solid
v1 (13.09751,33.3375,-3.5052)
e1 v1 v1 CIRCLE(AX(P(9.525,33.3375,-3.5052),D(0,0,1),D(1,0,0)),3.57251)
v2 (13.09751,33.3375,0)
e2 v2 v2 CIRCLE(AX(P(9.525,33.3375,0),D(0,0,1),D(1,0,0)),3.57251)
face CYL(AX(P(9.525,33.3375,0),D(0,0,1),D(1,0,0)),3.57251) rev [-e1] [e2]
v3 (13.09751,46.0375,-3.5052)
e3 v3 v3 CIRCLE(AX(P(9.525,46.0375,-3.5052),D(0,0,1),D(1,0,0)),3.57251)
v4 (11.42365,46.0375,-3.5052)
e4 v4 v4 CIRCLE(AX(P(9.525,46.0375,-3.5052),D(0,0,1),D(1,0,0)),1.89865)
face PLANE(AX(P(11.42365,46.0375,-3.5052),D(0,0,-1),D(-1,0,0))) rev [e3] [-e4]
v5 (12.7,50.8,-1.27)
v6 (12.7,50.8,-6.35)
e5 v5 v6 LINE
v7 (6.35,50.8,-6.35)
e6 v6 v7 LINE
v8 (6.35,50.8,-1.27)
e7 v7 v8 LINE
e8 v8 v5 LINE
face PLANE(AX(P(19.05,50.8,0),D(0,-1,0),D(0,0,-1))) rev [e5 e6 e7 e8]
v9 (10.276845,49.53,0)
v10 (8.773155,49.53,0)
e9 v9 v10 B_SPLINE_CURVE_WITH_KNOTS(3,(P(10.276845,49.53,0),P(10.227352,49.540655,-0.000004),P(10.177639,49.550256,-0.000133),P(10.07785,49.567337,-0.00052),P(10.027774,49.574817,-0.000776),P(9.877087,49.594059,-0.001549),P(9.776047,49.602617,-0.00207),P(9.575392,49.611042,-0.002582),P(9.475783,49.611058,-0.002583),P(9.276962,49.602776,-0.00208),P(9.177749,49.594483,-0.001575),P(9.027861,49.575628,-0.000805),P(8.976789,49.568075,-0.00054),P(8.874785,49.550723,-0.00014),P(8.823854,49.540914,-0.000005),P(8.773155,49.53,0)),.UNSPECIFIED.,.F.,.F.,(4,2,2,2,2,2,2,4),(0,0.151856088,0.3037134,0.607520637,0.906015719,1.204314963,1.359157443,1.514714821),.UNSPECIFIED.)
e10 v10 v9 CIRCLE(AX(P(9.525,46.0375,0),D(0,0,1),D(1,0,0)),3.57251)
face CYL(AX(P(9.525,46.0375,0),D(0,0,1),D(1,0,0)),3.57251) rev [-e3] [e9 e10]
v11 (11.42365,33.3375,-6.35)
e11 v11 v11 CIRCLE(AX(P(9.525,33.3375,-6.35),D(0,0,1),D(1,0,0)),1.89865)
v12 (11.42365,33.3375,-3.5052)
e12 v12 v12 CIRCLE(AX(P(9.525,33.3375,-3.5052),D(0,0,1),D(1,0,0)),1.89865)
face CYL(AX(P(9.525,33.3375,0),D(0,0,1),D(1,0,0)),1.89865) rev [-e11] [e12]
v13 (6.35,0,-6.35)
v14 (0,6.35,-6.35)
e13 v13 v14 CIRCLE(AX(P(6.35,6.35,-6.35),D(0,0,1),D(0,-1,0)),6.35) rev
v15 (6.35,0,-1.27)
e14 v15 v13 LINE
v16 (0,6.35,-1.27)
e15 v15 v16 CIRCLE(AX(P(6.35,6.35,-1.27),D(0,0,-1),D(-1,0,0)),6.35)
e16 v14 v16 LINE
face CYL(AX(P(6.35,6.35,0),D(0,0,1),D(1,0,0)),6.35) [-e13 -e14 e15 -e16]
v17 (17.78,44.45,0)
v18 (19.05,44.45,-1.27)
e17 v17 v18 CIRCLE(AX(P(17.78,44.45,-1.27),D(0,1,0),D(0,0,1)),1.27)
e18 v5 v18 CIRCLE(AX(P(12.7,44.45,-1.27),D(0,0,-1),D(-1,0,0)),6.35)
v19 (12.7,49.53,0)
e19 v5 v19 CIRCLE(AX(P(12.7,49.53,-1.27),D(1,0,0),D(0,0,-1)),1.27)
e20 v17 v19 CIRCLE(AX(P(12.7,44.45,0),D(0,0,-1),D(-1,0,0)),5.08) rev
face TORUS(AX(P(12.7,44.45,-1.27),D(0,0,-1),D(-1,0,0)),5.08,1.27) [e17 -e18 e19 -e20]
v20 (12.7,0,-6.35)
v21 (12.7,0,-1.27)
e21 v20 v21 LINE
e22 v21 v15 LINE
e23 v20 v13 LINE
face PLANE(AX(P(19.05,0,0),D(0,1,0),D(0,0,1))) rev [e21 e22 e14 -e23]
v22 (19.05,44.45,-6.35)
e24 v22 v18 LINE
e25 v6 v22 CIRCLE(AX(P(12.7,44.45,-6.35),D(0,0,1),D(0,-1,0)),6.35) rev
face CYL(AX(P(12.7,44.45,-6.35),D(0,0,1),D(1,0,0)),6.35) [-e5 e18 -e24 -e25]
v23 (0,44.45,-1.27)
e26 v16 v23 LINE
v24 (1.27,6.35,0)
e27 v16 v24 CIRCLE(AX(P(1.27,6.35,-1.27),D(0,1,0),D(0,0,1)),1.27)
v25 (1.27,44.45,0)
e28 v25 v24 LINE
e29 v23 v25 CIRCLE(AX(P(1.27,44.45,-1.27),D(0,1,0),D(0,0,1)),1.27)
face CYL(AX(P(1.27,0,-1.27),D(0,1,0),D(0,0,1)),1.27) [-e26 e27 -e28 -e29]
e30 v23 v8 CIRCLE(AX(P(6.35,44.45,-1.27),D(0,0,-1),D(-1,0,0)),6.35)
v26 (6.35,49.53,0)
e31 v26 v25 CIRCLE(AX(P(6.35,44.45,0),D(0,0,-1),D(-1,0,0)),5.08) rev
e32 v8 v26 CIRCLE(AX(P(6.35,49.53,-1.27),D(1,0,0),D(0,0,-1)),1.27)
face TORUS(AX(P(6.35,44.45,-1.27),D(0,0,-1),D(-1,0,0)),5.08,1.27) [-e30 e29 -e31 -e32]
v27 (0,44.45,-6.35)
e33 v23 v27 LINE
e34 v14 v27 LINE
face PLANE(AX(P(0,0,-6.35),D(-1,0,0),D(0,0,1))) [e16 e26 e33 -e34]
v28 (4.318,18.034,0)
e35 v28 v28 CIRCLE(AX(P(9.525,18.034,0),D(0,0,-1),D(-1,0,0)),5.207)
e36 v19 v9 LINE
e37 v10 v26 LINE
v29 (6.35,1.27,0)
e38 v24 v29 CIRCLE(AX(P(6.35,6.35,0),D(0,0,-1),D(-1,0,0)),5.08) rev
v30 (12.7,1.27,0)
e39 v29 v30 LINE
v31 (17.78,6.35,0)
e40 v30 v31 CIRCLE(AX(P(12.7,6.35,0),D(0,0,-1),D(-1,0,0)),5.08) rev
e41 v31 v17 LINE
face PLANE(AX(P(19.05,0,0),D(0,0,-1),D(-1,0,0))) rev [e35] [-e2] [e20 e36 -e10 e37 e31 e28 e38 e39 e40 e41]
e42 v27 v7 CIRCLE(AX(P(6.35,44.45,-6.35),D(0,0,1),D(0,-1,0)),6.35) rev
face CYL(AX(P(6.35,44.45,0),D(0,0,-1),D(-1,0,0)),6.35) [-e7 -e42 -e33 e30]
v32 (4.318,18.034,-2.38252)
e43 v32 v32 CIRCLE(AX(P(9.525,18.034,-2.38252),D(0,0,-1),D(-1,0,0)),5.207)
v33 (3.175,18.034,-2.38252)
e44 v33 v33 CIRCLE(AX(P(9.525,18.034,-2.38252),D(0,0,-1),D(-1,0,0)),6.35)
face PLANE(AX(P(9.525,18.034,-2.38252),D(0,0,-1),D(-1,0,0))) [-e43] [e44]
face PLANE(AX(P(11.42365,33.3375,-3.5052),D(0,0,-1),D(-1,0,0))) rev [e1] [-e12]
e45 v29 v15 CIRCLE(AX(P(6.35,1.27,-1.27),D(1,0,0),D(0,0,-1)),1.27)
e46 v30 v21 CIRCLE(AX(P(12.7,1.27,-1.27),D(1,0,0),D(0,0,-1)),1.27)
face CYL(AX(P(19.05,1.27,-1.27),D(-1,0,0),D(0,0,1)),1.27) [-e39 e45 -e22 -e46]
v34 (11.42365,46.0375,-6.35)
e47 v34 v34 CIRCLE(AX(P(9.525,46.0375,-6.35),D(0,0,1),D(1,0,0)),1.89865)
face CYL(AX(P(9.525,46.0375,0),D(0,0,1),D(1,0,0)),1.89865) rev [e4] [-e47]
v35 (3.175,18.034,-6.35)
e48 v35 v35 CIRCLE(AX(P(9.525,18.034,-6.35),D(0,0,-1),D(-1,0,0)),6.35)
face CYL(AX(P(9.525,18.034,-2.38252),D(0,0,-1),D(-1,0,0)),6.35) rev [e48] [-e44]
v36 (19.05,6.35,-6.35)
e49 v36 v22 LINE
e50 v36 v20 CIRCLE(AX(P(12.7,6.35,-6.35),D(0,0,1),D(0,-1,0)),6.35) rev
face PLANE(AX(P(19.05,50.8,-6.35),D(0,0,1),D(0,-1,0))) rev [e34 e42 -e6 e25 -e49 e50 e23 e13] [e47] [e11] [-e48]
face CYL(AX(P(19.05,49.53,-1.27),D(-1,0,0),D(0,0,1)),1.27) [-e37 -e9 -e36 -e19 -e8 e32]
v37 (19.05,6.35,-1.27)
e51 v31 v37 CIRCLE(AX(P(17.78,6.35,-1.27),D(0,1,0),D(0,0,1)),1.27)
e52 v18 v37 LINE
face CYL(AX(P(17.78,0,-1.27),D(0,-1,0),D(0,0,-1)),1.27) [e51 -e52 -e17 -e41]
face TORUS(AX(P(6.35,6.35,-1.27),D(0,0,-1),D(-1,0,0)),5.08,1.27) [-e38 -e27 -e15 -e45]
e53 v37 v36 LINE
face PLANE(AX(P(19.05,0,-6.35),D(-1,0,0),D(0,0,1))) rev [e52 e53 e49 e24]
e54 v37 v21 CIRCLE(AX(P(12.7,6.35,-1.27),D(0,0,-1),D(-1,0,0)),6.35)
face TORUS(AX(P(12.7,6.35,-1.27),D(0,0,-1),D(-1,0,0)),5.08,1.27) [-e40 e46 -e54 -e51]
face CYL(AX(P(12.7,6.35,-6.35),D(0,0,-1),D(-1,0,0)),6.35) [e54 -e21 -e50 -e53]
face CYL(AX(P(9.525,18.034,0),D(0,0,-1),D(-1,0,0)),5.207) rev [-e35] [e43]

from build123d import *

# Parameters (mm, degrees)
SKETCH1_W                                      = 6.35
SKETCH1_H                                      = 50.8
BODY_DEPTH                                     = 19.05
SKETCH2_R                                      = 5.207
PITCH_AXLE_OPENING_DEPTH                       = 6.35
CBORE_FOR_6_SOCKET_HEAD_CAP_SCREW1_D           = 3.7973
CBORE_FOR_6_SOCKET_HEAD_CAP_SCREW1_CBORE_D     = 7.14502
CBORE_FOR_6_SOCKET_HEAD_CAP_SCREW1_CBORE_DEPTH = 3.5052
FILLET1_R                                      = 6.35
FILLET2_R                                      = 1.27
SKETCH2_3_R                                    = 6.35
SKETCH2_3_R_2                                  = 5.207
BEARING_RECESS_DEPTH                           = 3.96748


with BuildPart() as part:
    # Sketch1 → Body (new body)
    with BuildSketch(Plane(origin=(0, 0, 0), x_dir=(0, 0, -1), z_dir=(1, 0, 0))):
        with Locations((3.175, 25.4)):
            Rectangle(SKETCH1_W, SKETCH1_H)
    extrude(amount=BODY_DEPTH)

    # Sketch2 → Pitch Axle Opening (cut)
    with BuildSketch(Plane(origin=(0, 0, -6.35), x_dir=(-1, 0, 0), z_dir=(0, 0, -1))):
        with Locations((-9.525, 18.034)):
            Circle(SKETCH2_R)
    extrude(amount=-PITCH_AXLE_OPENING_DEPTH, mode=Mode.SUBTRACT)

    # CBORE for #6 Socket Head Cap Screw1 (through all)
    with Locations(Plane.XY):
        with Locations((9.525, 46.0375), (9.525, 33.3375)):
            CounterBoreHole(CBORE_FOR_6_SOCKET_HEAD_CAP_SCREW1_D / 2, CBORE_FOR_6_SOCKET_HEAD_CAP_SCREW1_CBORE_D / 2, CBORE_FOR_6_SOCKET_HEAD_CAP_SCREW1_CBORE_DEPTH)

    # Fillet1
    fillet1_edges = [part.edges().sort_by_distance(p)[0] for p in [
        (19.05, 50.8, -3.175),
        (19.05, 0, -3.175),
        (0, 50.8, -3.175),
        (0, 0, -3.175),
    ]]
    fillet(fillet1_edges, radius=FILLET1_R)

    # Fillet2
    # the kernel refuses this fillet: 1.27 mm, written as the material it takes off along each edge
    with BuildSketch(Plane(origin=(6.35, 50.8, 0), x_dir=(0, -1, 0), z_dir=(1, 0, 0))) as fillet2_piece_1:
        with BuildLine():
            CenterArc((FILLET2_R, FILLET2_R), FILLET2_R, 180, 90)
            Line((0, FILLET2_R), (0, 0))
            Line((0, 0), (FILLET2_R, 0))
        make_face()
    extrude(amount=6.35, mode=Mode.SUBTRACT)
    with BuildSketch(Plane(origin=(0, 6.35, 0), x_dir=(1, 0, 0), z_dir=(0, 1, 0))) as fillet2_piece_2:
        with BuildLine():
            CenterArc((FILLET2_R, FILLET2_R), FILLET2_R, 180, 90)
            Line((0, FILLET2_R), (0, 0))
            Line((0, 0), (FILLET2_R, 0))
        make_face()
    extrude(amount=38.1, mode=Mode.SUBTRACT)
    with BuildSketch(Plane(origin=(6.35, 0, 0), x_dir=(0, 1, 0), z_dir=(1, 0, 0))) as fillet2_piece_3:
        with BuildLine():
            CenterArc((FILLET2_R, -FILLET2_R), FILLET2_R, 90, 90)
            Line((0, -FILLET2_R), (0, 0))
            Line((0, 0), (FILLET2_R, 0))
        make_face()
    extrude(amount=6.35, mode=Mode.SUBTRACT)
    with BuildSketch(Plane(origin=(19.05, 6.35, 0), x_dir=(-1, 0, 0), z_dir=(0, 1, 0))) as fillet2_piece_4:
        with BuildLine():
            CenterArc((FILLET2_R, -FILLET2_R), FILLET2_R, 90, 90)
            Line((0, -FILLET2_R), (0, 0))
            Line((0, 0), (FILLET2_R, 0))
        make_face()
    extrude(amount=38.1, mode=Mode.SUBTRACT)
    with BuildSketch(Plane(origin=(12.7, 6.35, 0), x_dir=(0, -1, 0), z_dir=(-1, 0, 0))) as fillet2_piece_5:
        with BuildLine():
            CenterArc((6.35 - FILLET2_R, -FILLET2_R), FILLET2_R, 0, 90)
            Line((6.35, -FILLET2_R), (6.35, 0))
            Line((6.35, 0), (6.35 - FILLET2_R, 0))
        make_face()
    revolve(axis=Axis((12.7, 6.35, 0), (0, 0, 1)), revolution_arc=90, mode=Mode.SUBTRACT)
    with BuildSketch(Plane(origin=(6.35, 6.35, 0), x_dir=(0, -1, 0), z_dir=(1, 0, 0))) as fillet2_piece_6:
        with BuildLine():
            CenterArc((6.35 - FILLET2_R, FILLET2_R), FILLET2_R, 270, 90)
            Line((6.35, FILLET2_R), (6.35, 0))
            Line((6.35, 0), (6.35 - FILLET2_R, 0))
        make_face()
    revolve(axis=Axis((6.35, 6.35, 0), (0, 0, -1)), revolution_arc=90, mode=Mode.SUBTRACT)
    with BuildSketch(Plane(origin=(12.7, 44.45, 0), x_dir=(1, 0, 0), z_dir=(0, -1, 0))) as fillet2_piece_7:
        with BuildLine():
            CenterArc((6.35 - FILLET2_R, -FILLET2_R), FILLET2_R, 0, 90)
            Line((6.35, -FILLET2_R), (6.35, 0))
            Line((6.35, 0), (6.35 - FILLET2_R, 0))
        make_face()
    revolve(axis=Axis((12.7, 44.45, 0), (0, 0, 1)), revolution_arc=90, mode=Mode.SUBTRACT)
    with BuildSketch(Plane(origin=(6.35, 44.45, 0), x_dir=(-1, 0, 0), z_dir=(0, -1, 0))) as fillet2_piece_8:
        with BuildLine():
            CenterArc((6.35 - FILLET2_R, FILLET2_R), FILLET2_R, 270, 90)
            Line((6.35, FILLET2_R), (6.35, 0))
            Line((6.35, 0), (6.35 - FILLET2_R, 0))
        make_face()
    revolve(axis=Axis((6.35, 44.45, 0), (0, 0, -1)), revolution_arc=90, mode=Mode.SUBTRACT)

    # Sketch2<3> → Bearing Recess (cut)
    with BuildSketch(Plane(origin=(0, 0, -6.35), x_dir=(-1, 0, 0), z_dir=(0, 0, -1))):
        with Locations((-9.525, 18.034)):
            Circle(SKETCH2_3_R)
        with Locations((-9.525, 18.034)):
            Circle(SKETCH2_3_R_2, mode=Mode.SUBTRACT)
    extrude(amount=-BEARING_RECESS_DEPTH, mode=Mode.SUBTRACT)


solid = part.part
